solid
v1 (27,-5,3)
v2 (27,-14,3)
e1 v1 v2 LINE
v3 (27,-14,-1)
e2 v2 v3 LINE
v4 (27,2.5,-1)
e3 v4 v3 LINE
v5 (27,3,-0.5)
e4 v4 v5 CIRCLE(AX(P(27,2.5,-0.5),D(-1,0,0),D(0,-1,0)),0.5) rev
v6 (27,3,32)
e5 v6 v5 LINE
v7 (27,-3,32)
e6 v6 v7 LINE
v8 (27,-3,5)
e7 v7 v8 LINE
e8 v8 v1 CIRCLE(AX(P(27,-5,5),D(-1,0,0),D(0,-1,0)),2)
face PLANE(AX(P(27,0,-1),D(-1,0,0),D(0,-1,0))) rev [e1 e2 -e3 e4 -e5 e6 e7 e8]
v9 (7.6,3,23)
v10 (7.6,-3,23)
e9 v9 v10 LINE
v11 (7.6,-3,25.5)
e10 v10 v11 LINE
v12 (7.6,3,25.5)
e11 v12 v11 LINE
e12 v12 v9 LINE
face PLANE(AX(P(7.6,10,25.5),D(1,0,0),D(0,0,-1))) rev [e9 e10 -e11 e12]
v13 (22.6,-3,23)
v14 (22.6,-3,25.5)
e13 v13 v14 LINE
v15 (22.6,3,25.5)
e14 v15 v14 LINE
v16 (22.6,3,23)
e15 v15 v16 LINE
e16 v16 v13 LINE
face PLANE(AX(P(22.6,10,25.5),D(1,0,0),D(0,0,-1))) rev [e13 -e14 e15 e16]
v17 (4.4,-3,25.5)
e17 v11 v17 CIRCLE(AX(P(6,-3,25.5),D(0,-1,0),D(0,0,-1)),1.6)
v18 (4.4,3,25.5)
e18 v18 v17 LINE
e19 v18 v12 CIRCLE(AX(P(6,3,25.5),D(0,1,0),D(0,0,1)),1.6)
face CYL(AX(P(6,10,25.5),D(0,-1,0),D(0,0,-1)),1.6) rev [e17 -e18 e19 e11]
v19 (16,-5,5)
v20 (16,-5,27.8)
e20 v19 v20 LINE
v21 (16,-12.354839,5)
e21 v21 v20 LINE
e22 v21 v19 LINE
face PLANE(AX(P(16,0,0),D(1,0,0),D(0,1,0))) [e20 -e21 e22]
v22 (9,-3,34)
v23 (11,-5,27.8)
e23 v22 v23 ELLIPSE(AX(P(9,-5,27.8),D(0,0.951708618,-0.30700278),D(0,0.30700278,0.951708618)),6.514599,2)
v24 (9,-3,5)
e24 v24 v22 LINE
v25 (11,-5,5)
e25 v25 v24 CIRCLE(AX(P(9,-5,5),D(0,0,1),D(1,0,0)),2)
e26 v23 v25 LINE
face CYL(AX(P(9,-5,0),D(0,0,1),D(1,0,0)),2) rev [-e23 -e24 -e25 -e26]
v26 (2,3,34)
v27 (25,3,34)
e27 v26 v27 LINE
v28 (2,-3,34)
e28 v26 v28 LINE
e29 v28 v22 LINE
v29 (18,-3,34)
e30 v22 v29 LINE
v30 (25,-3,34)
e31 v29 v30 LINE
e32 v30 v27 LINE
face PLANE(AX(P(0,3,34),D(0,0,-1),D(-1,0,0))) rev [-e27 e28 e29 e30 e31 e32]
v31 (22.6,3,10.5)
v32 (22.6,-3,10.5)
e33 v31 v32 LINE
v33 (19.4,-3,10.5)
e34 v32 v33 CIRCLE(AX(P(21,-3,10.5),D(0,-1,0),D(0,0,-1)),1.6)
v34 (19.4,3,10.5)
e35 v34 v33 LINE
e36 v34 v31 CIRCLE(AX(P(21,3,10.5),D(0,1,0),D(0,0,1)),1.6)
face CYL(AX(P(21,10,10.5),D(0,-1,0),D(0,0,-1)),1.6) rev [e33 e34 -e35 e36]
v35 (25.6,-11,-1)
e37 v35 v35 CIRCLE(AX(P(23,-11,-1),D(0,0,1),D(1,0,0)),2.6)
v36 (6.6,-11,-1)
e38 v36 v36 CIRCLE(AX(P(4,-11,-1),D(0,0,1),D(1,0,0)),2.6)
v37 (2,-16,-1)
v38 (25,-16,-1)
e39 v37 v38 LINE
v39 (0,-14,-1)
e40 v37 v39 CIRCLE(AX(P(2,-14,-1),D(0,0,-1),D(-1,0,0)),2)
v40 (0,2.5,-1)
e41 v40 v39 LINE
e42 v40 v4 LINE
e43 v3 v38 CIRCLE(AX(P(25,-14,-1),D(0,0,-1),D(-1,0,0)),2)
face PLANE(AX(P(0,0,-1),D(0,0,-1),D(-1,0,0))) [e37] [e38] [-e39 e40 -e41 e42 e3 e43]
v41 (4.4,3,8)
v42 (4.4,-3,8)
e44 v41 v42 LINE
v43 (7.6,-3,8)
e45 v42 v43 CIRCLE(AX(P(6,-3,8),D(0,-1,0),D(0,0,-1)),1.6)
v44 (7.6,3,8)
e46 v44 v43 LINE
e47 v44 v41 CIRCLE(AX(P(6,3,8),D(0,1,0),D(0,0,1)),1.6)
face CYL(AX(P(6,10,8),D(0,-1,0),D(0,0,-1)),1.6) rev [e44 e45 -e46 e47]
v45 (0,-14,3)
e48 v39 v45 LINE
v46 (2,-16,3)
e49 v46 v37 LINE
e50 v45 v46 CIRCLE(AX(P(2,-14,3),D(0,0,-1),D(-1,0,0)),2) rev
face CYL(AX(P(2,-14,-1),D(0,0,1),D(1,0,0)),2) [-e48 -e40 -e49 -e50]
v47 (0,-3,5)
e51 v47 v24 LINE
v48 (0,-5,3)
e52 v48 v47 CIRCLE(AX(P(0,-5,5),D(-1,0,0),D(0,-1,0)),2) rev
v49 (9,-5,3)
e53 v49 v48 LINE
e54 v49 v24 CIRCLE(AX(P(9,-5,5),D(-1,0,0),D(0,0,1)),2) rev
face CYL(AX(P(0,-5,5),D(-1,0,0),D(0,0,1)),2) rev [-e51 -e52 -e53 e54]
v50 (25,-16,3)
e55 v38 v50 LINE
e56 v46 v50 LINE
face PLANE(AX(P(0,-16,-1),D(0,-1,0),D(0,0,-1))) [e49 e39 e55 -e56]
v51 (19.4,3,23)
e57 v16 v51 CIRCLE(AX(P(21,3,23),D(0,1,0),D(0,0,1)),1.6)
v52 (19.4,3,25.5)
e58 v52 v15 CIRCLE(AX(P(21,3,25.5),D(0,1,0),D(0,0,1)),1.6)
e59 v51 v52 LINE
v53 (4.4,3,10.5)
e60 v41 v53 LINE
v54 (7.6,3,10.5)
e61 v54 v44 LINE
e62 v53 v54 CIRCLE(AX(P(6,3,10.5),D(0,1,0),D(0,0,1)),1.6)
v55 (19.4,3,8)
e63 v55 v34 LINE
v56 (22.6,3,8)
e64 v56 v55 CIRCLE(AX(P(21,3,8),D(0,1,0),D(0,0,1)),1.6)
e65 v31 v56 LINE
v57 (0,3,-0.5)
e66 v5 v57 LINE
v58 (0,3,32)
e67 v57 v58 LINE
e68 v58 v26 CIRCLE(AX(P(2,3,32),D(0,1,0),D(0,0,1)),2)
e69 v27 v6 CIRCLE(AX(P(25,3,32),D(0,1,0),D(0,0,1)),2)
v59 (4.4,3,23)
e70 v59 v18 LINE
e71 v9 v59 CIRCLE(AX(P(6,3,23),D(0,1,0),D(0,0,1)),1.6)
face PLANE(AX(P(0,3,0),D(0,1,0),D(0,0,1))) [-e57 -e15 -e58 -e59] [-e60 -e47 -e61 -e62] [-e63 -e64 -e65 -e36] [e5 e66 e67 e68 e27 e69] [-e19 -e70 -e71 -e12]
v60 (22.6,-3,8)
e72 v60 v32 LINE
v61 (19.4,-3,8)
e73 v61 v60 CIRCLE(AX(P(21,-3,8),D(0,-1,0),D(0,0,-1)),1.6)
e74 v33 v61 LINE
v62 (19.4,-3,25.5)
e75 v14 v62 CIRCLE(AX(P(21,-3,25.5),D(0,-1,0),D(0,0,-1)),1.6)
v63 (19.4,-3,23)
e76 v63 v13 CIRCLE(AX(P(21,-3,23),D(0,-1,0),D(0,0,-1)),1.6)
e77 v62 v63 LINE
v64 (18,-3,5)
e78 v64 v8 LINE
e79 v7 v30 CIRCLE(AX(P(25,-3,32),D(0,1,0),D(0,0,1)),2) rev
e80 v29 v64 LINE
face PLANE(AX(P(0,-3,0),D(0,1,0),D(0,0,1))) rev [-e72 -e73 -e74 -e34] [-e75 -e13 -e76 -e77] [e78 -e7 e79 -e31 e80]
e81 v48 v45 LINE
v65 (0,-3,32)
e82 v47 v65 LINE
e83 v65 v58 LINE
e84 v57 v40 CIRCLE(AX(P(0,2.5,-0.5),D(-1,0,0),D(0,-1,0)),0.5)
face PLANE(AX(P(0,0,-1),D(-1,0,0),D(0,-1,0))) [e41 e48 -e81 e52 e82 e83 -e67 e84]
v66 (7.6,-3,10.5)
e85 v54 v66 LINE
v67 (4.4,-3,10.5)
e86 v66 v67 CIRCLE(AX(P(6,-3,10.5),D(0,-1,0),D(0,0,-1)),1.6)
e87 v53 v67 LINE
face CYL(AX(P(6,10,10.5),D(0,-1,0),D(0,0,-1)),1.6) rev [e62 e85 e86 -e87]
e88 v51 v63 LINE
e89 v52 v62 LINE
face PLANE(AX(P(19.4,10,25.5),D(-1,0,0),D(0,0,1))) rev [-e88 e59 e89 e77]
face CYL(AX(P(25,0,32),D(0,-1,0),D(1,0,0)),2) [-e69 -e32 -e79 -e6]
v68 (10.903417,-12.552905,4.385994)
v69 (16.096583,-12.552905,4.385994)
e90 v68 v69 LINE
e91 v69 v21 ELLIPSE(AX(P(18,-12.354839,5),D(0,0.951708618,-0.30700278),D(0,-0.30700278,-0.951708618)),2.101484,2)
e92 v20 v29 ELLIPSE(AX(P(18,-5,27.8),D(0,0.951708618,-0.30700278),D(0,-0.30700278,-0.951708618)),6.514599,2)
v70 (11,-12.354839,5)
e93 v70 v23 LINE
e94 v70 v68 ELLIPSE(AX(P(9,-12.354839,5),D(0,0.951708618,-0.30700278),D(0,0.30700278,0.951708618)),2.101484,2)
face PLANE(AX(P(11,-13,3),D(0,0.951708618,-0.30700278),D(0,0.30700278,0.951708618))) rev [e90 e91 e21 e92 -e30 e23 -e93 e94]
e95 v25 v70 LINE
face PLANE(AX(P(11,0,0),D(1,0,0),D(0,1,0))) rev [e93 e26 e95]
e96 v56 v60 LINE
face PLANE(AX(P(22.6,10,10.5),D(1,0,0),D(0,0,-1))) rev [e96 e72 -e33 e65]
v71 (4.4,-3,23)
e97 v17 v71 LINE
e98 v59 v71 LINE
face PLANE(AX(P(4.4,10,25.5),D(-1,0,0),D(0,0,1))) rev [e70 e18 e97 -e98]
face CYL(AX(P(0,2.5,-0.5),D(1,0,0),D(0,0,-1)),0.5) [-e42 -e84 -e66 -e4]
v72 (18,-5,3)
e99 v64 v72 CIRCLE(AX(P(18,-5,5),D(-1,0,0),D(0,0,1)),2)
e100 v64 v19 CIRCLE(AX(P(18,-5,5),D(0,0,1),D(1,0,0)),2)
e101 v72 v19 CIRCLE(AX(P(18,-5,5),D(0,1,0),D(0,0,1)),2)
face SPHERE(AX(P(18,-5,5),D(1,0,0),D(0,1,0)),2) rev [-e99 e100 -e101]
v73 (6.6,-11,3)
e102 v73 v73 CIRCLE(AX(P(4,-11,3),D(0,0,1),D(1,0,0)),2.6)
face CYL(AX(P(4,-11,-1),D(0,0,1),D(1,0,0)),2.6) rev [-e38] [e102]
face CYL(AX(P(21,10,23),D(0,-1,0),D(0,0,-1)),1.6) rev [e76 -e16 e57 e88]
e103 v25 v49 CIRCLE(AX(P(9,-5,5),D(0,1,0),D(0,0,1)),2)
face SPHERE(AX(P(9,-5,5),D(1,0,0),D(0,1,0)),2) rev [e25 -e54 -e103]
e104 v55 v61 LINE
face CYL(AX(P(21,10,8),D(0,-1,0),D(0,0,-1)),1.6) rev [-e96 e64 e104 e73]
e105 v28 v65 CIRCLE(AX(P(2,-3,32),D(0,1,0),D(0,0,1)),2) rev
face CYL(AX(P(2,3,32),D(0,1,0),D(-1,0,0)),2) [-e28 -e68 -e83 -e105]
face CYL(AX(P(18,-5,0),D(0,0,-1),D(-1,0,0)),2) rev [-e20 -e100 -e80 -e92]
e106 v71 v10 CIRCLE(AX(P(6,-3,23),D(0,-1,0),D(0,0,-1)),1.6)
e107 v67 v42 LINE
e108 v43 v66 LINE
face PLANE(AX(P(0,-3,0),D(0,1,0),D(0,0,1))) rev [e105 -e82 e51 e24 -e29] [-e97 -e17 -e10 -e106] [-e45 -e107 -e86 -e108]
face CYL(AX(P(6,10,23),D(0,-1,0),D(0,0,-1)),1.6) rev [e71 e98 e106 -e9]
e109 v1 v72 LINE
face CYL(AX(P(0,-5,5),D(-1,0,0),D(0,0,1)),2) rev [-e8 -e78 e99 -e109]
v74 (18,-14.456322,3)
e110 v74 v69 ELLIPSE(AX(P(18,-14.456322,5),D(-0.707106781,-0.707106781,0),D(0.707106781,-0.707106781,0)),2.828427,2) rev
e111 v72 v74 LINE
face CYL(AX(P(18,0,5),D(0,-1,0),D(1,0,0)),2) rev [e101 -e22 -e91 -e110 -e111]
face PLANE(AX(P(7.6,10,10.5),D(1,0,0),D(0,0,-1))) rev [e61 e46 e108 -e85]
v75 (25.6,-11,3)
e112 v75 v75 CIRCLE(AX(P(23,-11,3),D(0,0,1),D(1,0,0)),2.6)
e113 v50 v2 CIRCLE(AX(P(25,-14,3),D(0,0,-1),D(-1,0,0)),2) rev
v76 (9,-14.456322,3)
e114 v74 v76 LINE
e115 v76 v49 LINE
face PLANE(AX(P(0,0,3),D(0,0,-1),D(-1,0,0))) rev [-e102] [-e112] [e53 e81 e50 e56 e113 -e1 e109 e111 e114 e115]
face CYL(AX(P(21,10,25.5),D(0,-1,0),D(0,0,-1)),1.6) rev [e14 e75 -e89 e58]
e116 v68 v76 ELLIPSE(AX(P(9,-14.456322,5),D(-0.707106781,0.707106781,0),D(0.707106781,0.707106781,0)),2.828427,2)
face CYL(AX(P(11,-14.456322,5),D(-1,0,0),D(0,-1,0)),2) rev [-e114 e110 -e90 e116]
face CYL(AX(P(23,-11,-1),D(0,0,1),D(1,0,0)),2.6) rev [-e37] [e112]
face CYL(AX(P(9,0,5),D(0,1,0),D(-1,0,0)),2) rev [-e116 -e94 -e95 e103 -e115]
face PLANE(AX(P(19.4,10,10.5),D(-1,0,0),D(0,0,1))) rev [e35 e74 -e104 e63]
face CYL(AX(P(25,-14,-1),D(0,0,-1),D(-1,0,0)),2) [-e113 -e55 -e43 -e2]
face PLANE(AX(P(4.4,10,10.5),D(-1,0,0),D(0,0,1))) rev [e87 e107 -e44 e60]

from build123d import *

# Parameters (mm, degrees)
EXTRUDE_2_DEPTH      = 3
EXTRUDE_2_DEPTH_BACK = 1
SKETCH_1_W           = 27
SKETCH_1_H           = 16
EXTRUDE_4_DEPTH      = 3
EXTRUDE_4_DEPTH_BACK = 3
SKETCH_3_W           = 27
SKETCH_3_H           = 34
CUT_EXTRUDE_11_DEPTH = 13
EXTRUDE_5_DEPTH      = 2.5
EXTRUDE_5_DEPTH_BACK = 2.5
FILLET_2_R           = 2
FILLET_3_R           = 2
SKETCH_14_W          = 27
SKETCH_14_H          = 3
EXTRUDE_6_DEPTH      = 1
FILLET_5_R           = 0.5
SKETCH_16_R          = 2.6
CUT_EXTRUDE_12_DEPTH = 4


with BuildPart() as part:
    # 草图1 → 凸台-拉伸2 (new, two sides: drawn at the far end of the back side and taken through both)
    with BuildSketch(Plane.XY.offset(-EXTRUDE_2_DEPTH_BACK)):
        with Locations((13.5, -8)):
            Rectangle(SKETCH_1_W, SKETCH_1_H)
    extrude(amount=EXTRUDE_2_DEPTH + EXTRUDE_2_DEPTH_BACK)

    # 草图3 → 凸台-拉伸4 (add, two sides: drawn at the far end of the back side and taken through both)
    with BuildSketch(Plane(origin=(0, 0, 0), x_dir=(1, 0, 0), z_dir=(0, 1, 0)).offset(-EXTRUDE_4_DEPTH_BACK)):
        with Locations((13.5, -17)):
            Rectangle(SKETCH_3_W, SKETCH_3_H)
    extrude(amount=EXTRUDE_4_DEPTH + EXTRUDE_4_DEPTH_BACK)

    # 草图4 → 切除-拉伸11 (cut)
    with BuildSketch(Plane(origin=(0, -3, 0), x_dir=(-1, 0, 0), z_dir=(0, -1, 0))):
        with BuildLine():
            Line((-7.6, -10.5), (-7.6, -8))
            ThreePointArc((-7.6, -8), (-6, -6.4), (-4.4, -8))
            Line((-4.4, -8), (-4.4, -10.5))
            ThreePointArc((-4.4, -10.5), (-6, -12.1), (-7.6, -10.5))
        make_face()
        with BuildLine():
            Line((-22.6, -10.5), (-22.6, -8))
            ThreePointArc((-22.6, -8), (-21, -6.4), (-19.4, -8))
            Line((-19.4, -8), (-19.4, -10.5))
            ThreePointArc((-19.4, -10.5), (-21, -12.1), (-22.6, -10.5))
        make_face()
        with BuildLine():
            Line((-7.6, -25.5), (-7.6, -23))
            ThreePointArc((-7.6, -23), (-6, -21.4), (-4.4, -23))
            Line((-4.4, -23), (-4.4, -25.5))
            ThreePointArc((-4.4, -25.5), (-6, -27.1), (-7.6, -25.5))
        make_face()
        with BuildLine():
            Line((-22.6, -25.5), (-22.6, -23))
            ThreePointArc((-22.6, -23), (-21, -21.4), (-19.4, -23))
            Line((-19.4, -23), (-19.4, -25.5))
            ThreePointArc((-19.4, -25.5), (-21, -27.1), (-22.6, -25.5))
        make_face()
    extrude(amount=-CUT_EXTRUDE_11_DEPTH, mode=Mode.SUBTRACT)

    # 草图13 → 凸台-拉伸5 (add, two sides: drawn at the far end of the back side and taken through both)
    with BuildSketch(Plane.ZY.offset(-13.5).offset(-EXTRUDE_5_DEPTH_BACK)):
        Polygon((3, -13), (34, -3), (3, -3), align=None)
    extrude(amount=EXTRUDE_5_DEPTH + EXTRUDE_5_DEPTH_BACK)

    # 圆角2
    fillet_2_edges = [part.edges().sort_by_distance(p)[0] for p in [
        (21.5, -3, 3),
        (5.5, -3, 3),
        (0, 0, 34),
        (27, 0, 34),
        (0, -16, 1),
        (27, -16, 1),
    ]]
    fillet(fillet_2_edges, radius=FILLET_2_R)

    # 圆角3
    # the kernel refuses this fillet: 2 mm, written as the material it adds along each edge
    with BuildSketch(Plane(origin=(11, -13, 3), x_dir=(0, -1, 0), z_dir=(1, 0, 0))) as fillet_3_piece_1:
        with BuildLine():
            CenterArc((FILLET_3_R * 0.728161127413, -FILLET_3_R), FILLET_3_R, 90, 72.121303404)
            Line((-FILLET_3_R * 0.223547490347, -FILLET_3_R * 0.692997220077), (0, 0))
            Line((0, 0), (FILLET_3_R * 0.728161127413, 0))
        make_face()
    extrude(amount=5)
    with BuildSketch(Plane(origin=(16, -3, 34), x_dir=(0, -1, 0), z_dir=(0, 0, -1))) as fillet_3_piece_2_section:
        with BuildLine():
            CenterArc((FILLET_3_R, -FILLET_3_R), FILLET_3_R, 90, 90)
            Line((0, -FILLET_3_R), (0, 0))
            Line((0, 0), (FILLET_3_R, 0))
        make_face()
    fillet_3_piece_2 = extrude(amount=29, mode=Mode.PRIVATE)
    fillet_3_piece_2 = split(fillet_3_piece_2, bisect_by=Plane(origin=(16.465034927, -7.473683047, 20.131582554), z_dir=(0, 0.9517086177605509, -0.3070027799227584)), keep=Keep.TOP, mode=Mode.PRIVATE)
    add(fillet_3_piece_2)
    with BuildSketch(Plane(origin=(11, -3, 34), x_dir=(-1, 0, 0), z_dir=(0, 0, -1))) as fillet_3_piece_3_section:
        with BuildLine():
            CenterArc((FILLET_3_R, -FILLET_3_R), FILLET_3_R, 90, 90)
            Line((0, -FILLET_3_R), (0, 0))
            Line((0, 0), (FILLET_3_R, 0))
        make_face()
    fillet_3_piece_3 = extrude(amount=29, mode=Mode.PRIVATE)
    fillet_3_piece_3 = split(fillet_3_piece_3, bisect_by=Plane(origin=(10.534965073, -7.473683047, 20.131582554), z_dir=(0, 0.9517086177605509, -0.3070027799227584)), keep=Keep.TOP, mode=Mode.PRIVATE)
    add(fillet_3_piece_3)
    with BuildSketch(Plane(origin=(11, -5, 3), x_dir=(-1, 0, 0), z_dir=(0, -1, 0))) as fillet_3_piece_4_section:
        with BuildLine():
            CenterArc((FILLET_3_R, -FILLET_3_R), FILLET_3_R, 90, 90)
            Line((0, -FILLET_3_R), (0, 0))
            Line((0, 0), (FILLET_3_R, 0))
        make_face()
    fillet_3_piece_4 = extrude(amount=13, mode=Mode.PRIVATE)
    fillet_3_piece_4 = split(fillet_3_piece_4, bisect_by=Plane(origin=(10.542698912, -12.486166037, 4.592885286), z_dir=(0, 0.9517086177605509, -0.3070027799227584)), keep=Keep.TOP, mode=Mode.PRIVATE)
    add(fillet_3_piece_4)
    with BuildSketch(Plane(origin=(11, -5, 5), x_dir=(0, 0, -1), z_dir=(0, -1, 0))) as fillet_3_piece_5:
        with BuildLine():
            CenterArc((2 - FILLET_3_R, -FILLET_3_R), FILLET_3_R, 0, 90)
            Line((2 - FILLET_3_R, 0), (2, 0))
            Line((2, 0), (2, -FILLET_3_R))
        make_face()
    revolve(axis=Axis((11, -5, 5), (1, 0, 0)), revolution_arc=90)
    with BuildSketch(Plane(origin=(16, -5, 3), x_dir=(1, 0, 0), z_dir=(0, -1, 0))) as fillet_3_piece_6_section:
        with BuildLine():
            CenterArc((FILLET_3_R, FILLET_3_R), FILLET_3_R, 180, 90)
            Line((0, FILLET_3_R), (0, 0))
            Line((0, 0), (FILLET_3_R, 0))
        make_face()
    fillet_3_piece_6 = extrude(amount=13, mode=Mode.PRIVATE)
    fillet_3_piece_6 = split(fillet_3_piece_6, bisect_by=Plane(origin=(16.457301088, -12.486166037, 4.592885286), z_dir=(0, 0.9517086177605509, -0.3070027799227584)), keep=Keep.TOP, mode=Mode.PRIVATE)
    add(fillet_3_piece_6)
    with BuildSketch(Plane(origin=(16, -5, 5), x_dir=(0, 0, -1), z_dir=(0, -1, 0))) as fillet_3_piece_7:
        with BuildLine():
            CenterArc((2 - FILLET_3_R, FILLET_3_R), FILLET_3_R, 270, 90)
            Line((2 - FILLET_3_R, 0), (2, 0))
            Line((2, 0), (2, FILLET_3_R))
        make_face()
    revolve(axis=Axis((16, -5, 5), (1, 0, 0)), revolution_arc=90)
    with BuildSketch(Plane(origin=(11, -5, 3), x_dir=(-1, 0, 0), z_dir=(0, -1, 0))) as fillet_3_piece_8a_section:
        with BuildLine():
            CenterArc((FILLET_3_R, -FILLET_3_R), FILLET_3_R, 90, 90)
            Line((0, -FILLET_3_R), (0, 0))
            Line((0, 0), (FILLET_3_R, 0))
        make_face()
    fillet_3_piece_8a = extrude(amount=13, mode=Mode.PRIVATE)
    fillet_3_piece_8a = split(fillet_3_piece_8a, bisect_by=Plane(origin=(10.55847084, -16, 3.471852111), z_dir=(0, 1, 0)), keep=Keep.TOP, mode=Mode.PRIVATE)
    fillet_3_piece_8a = split(fillet_3_piece_8a, bisect_by=Plane(origin=(10.55847084, -12.996338669, 3.011350127), z_dir=(0, -0.9517086177605509, 0.3070027799227584)), keep=Keep.TOP, mode=Mode.PRIVATE)
    with BuildSketch(Plane(origin=(7.359194363, -13, 3), x_dir=(0, -1, 0), z_dir=(1, 0, 0))) as fillet_3_piece_8b_section:
        with BuildLine():
            CenterArc((FILLET_3_R * 0.728161127413, -FILLET_3_R), FILLET_3_R, 90, 72.121303404)
            Line((-FILLET_3_R * 0.223547490347, -FILLET_3_R * 0.692997220077), (0, 0))
            Line((0, 0), (FILLET_3_R * 0.728161127413, 0))
        make_face()
    fillet_3_piece_8b = extrude(amount=8.640805637, mode=Mode.PRIVATE)
    fillet_3_piece_8b = split(fillet_3_piece_8b, bisect_by=Plane(origin=(11, -13.221902521, 3.304743707), z_dir=(-1, 0, 0)), keep=Keep.TOP, mode=Mode.PRIVATE)
    fillet_3_piece_8 = fillet_3_piece_8a & fillet_3_piece_8b
    add(fillet_3_piece_8)
    with BuildSketch(Plane(origin=(16, -5, 3), x_dir=(1, 0, 0), z_dir=(0, -1, 0))) as fillet_3_piece_9a_section:
        with BuildLine():
            CenterArc((FILLET_3_R, FILLET_3_R), FILLET_3_R, 180, 90)
            Line((0, FILLET_3_R), (0, 0))
            Line((0, 0), (FILLET_3_R, 0))
        make_face()
    fillet_3_piece_9a = extrude(amount=13, mode=Mode.PRIVATE)
    fillet_3_piece_9a = split(fillet_3_piece_9a, bisect_by=Plane(origin=(16.44152916, -16, 3.471852111), z_dir=(0, 1, 0)), keep=Keep.TOP, mode=Mode.PRIVATE)
    fillet_3_piece_9a = split(fillet_3_piece_9a, bisect_by=Plane(origin=(16.44152916, -12.996338669, 3.011350127), z_dir=(0, -0.9517086177605509, 0.3070027799227584)), keep=Keep.TOP, mode=Mode.PRIVATE)
    with BuildSketch(Plane(origin=(11, -13, 3), x_dir=(0, -1, 0), z_dir=(1, 0, 0))) as fillet_3_piece_9b_section:
        with BuildLine():
            CenterArc((FILLET_3_R * 0.728161127413, -FILLET_3_R), FILLET_3_R, 90, 72.121303404)
            Line((-FILLET_3_R * 0.223547490347, -FILLET_3_R * 0.692997220077), (0, 0))
            Line((0, 0), (FILLET_3_R * 0.728161127413, 0))
        make_face()
    fillet_3_piece_9b = extrude(amount=8.640805637, mode=Mode.PRIVATE)
    fillet_3_piece_9b = split(fillet_3_piece_9b, bisect_by=Plane(origin=(16, -13.221902521, 3.304743707), z_dir=(1, 0, 0)), keep=Keep.TOP, mode=Mode.PRIVATE)
    fillet_3_piece_9 = fillet_3_piece_9a & fillet_3_piece_9b
    add(fillet_3_piece_9)

    # 草图14 → 凸台-拉伸6 (add)
    with BuildSketch(Plane(origin=(0, 0, 0), x_dir=(-1, 0, 0), z_dir=(0, 0, -1))):
        with Locations((-13.5, 1.5)):
            Rectangle(SKETCH_14_W, SKETCH_14_H)
    extrude(amount=EXTRUDE_6_DEPTH)

    # 圆角5
    fillet_5_edges = [part.edges().sort_by_distance(p)[0] for p in [
        (13.5, 3, -1),
    ]]
    fillet(fillet_5_edges, radius=FILLET_5_R)

    # 草图16 → 切除-拉伸12 (cut)
    with BuildSketch(Plane.XY.offset(3)):
        with Locations((4, -11)):
            Circle(SKETCH_16_R)
        with Locations((23, -11)):
            Circle(SKETCH_16_R)
    extrude(amount=-CUT_EXTRUDE_12_DEPTH, mode=Mode.SUBTRACT)


solid = part.part
